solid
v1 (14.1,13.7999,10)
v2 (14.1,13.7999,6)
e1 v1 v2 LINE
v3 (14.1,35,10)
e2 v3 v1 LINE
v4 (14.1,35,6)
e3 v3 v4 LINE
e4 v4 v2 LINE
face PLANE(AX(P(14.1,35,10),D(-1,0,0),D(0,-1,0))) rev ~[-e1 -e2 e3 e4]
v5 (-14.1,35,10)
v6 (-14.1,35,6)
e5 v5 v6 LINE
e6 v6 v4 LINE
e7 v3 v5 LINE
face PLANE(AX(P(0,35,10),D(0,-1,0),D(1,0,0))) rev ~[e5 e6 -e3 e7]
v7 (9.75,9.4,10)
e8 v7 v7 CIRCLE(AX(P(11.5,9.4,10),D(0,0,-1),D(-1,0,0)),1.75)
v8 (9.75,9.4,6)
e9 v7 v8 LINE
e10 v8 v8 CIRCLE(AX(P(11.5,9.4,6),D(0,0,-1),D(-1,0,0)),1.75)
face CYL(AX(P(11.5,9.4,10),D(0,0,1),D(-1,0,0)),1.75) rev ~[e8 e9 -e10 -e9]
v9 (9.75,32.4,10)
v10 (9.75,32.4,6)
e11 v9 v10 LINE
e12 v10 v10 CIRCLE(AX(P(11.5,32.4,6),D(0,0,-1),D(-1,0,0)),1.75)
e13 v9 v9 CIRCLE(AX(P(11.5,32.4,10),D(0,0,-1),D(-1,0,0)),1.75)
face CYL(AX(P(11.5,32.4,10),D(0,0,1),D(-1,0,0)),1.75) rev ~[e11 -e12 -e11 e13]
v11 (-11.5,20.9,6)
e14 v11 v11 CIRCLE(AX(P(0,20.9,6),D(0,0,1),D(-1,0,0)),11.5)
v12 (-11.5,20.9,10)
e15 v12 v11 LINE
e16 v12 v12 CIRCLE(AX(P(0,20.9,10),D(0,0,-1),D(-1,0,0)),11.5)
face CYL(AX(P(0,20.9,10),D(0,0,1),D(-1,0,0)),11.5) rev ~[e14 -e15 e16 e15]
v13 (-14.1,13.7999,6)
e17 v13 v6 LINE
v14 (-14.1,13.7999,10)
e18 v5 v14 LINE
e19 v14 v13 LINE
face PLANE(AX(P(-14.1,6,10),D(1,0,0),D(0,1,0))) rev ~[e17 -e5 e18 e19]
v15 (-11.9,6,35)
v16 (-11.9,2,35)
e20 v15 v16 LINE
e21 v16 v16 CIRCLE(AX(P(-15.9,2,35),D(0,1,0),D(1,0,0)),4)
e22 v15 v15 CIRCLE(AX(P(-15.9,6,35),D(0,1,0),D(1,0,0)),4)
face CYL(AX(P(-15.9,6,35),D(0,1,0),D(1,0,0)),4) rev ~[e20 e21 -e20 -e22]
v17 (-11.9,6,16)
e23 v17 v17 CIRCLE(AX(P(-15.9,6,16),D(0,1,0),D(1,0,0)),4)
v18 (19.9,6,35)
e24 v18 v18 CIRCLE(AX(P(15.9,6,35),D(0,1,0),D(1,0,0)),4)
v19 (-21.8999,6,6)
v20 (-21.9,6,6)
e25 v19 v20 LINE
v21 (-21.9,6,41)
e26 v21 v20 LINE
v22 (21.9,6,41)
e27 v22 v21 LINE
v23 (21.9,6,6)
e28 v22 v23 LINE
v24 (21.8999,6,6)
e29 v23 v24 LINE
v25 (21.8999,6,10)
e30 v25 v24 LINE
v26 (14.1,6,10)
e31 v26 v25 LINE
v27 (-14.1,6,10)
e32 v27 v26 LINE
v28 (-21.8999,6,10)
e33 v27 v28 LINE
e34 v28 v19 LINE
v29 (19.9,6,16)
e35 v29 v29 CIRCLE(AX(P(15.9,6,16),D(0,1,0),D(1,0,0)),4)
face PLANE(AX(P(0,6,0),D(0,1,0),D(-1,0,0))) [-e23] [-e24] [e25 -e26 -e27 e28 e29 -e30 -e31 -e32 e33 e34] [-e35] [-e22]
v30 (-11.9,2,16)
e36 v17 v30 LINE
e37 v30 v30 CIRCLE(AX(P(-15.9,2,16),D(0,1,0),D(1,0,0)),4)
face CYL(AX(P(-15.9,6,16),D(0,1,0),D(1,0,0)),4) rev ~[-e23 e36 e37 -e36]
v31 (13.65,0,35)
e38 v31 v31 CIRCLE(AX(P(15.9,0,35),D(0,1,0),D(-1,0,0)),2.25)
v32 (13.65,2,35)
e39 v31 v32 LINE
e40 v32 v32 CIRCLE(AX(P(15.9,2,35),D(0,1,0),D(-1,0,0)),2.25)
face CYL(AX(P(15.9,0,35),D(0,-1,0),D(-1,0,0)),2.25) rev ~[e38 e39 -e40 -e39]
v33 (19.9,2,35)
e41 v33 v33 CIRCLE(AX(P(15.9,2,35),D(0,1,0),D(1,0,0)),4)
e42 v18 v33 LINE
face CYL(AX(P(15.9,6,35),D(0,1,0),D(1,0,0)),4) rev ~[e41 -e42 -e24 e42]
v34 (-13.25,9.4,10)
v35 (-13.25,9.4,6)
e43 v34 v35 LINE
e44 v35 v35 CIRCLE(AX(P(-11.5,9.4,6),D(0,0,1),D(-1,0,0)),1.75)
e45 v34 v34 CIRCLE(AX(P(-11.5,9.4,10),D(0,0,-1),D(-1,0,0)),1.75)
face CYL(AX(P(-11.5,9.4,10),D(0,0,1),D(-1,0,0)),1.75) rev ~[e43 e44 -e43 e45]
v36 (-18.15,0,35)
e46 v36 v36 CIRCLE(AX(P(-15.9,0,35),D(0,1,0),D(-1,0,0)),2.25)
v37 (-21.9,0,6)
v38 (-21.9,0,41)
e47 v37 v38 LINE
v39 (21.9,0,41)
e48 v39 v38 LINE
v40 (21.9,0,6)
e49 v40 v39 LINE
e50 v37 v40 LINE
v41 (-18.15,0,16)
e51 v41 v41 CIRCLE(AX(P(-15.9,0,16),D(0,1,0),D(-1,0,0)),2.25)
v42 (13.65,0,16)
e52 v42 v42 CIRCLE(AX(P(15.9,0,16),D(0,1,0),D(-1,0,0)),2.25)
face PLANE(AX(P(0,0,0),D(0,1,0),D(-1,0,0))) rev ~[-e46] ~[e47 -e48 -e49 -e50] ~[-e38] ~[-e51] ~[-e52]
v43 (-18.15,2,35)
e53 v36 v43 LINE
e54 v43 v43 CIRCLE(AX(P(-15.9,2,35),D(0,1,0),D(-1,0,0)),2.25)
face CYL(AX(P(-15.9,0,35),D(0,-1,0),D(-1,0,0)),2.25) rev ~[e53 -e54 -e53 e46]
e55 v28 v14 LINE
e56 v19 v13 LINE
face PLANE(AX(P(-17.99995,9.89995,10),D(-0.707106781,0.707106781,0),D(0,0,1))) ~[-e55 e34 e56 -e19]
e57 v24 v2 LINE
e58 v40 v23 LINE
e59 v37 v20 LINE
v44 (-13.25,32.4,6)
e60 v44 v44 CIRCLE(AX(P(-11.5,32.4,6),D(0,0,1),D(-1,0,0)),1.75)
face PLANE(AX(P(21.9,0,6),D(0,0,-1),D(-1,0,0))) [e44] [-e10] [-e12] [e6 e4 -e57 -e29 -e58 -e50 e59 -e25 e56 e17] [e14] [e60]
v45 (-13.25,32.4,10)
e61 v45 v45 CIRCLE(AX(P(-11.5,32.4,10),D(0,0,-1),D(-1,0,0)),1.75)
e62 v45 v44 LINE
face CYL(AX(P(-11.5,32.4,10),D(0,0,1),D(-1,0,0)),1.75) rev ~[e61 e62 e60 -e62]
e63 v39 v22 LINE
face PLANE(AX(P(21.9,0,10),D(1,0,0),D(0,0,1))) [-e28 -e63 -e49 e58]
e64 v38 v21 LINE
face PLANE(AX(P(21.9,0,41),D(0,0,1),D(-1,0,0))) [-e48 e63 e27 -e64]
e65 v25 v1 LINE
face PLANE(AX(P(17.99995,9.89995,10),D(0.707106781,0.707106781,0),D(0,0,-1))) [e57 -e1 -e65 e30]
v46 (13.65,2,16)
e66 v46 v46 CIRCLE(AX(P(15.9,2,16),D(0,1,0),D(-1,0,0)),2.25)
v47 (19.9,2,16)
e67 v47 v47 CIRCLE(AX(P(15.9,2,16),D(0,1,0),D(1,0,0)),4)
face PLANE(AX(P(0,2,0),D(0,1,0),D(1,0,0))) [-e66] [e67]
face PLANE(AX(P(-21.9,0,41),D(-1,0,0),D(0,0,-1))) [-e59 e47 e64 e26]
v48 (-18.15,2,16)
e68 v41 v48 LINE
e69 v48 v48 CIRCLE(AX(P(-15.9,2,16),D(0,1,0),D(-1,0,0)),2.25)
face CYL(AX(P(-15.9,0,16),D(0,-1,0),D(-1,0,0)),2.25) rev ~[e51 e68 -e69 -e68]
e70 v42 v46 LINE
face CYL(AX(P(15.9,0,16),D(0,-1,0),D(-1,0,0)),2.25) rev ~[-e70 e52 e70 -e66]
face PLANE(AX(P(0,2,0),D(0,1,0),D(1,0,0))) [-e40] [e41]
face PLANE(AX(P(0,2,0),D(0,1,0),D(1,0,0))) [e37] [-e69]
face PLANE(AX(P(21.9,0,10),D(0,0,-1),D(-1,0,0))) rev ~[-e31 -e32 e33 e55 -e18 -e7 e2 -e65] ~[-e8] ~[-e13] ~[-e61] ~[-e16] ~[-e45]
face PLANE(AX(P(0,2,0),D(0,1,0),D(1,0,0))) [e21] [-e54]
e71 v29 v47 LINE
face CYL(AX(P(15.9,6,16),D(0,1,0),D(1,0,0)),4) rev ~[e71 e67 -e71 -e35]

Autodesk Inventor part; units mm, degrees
ref_plane "YZ Plane" through (0, 0, 0) normal (1, 0, 0) x (0, 1, 0)
ref_plane "XZ Plane" through (0, 0, 0) normal (0, 1, 0) x (-1, 0, 0)
ref_plane "XY Plane" through (0, 0, 0) normal (0, 0, 1) x (1, 0, 0)
sketch "Sketch1" plane through (0, 0, 0) normal (0, 1, 0) x (-1, 0, 0)
  circle A0 centre (15.9, 35) radius 2.25
  circle A1 centre (15.9, 16) radius 2.25
  circle A2 centre (-15.9, 16) radius 2.25
  circle A3 centre (-15.9, 35) radius 2.25
  line L0 (21.9, 10) -> (-21.9, 10)
  line L1 (-21.9, 10) -> (-21.9, 41)
  line L2 (-21.9, 41) -> (21.9, 41)
  line L3 (21.9, 41) -> (21.9, 10)
  point P0 (0, 0)
  point P1 (0, 0)
  dimension "d0" = 43.8
  dimension "d1" = 31
extrude "Extrusion1" add sketch "Sketch1" along normal blind 6
sketch "Sketch2" plane through (0, 6, 0) normal (0, 1, 0) x (1, 0, 0)
  circle A0 centre (-15.9, -16) radius 2.25 projected
  circle A1 centre (-15.9, -16) radius 4
  circle A2 centre (-15.9, -35) radius 2.25 projected
  circle A3 centre (-15.9, -35) radius 4
  circle A4 centre (15.9, -35) radius 2.25 projected
  circle A5 centre (15.9, -35) radius 4
  circle A6 centre (15.9, -16) radius 2.25 projected
  circle A7 centre (15.9, -16) radius 4
  point P0 (0, 0)
  dimension "d4" = 8
  dimension "d5" = 8
  dimension "d6" = 8
  dimension "d7" = 8
extrude "Extrusion2" cut sketch "Sketch2" against normal blind 4
sketch "Sketch4" plane through (21.9, 0, 10) normal (0, 0, -1) x (-1, 0, 0)
  line L0 (43.8, 0) -> (0, 0) projected
  line L1 (43.8, 0) -> (43.8, 6) projected
  line L2 (0, 6) -> (43.8, 6) projected
  line L3 (0, 0) -> (0, 6) projected
  line L4 (0, 6) -> (43.8, 6) projected
  line L5 (36, 6) -> (36, 35)
  line L6 (36, 35) -> (21.9, 35)
  line L7 (36, 35) -> (7.8, 35)
  line L8 (7.8, 35) -> (7.8, 6)
  line L9 (36, 6.8) -> (36, 35)
  line L10 (33.4, 32.4) -> (21.9, 32.4)
  line L11 (10.4, 9.4) -> (33.4, 9.4)
  circle A0 centre (33.4, 32.4) radius 1.75
  circle A1 centre (10.4, 32.4) radius 1.75
  circle A2 centre (10.4, 9.4) radius 1.75
  circle A3 centre (33.4, 9.4) radius 1.75
  circle A4 centre (21.9, 20.9) radius 11.5
  point P0 (21.9, 0)
  dimension "d31" = 14.1
  dimension "d34" = 11.5
  dimension "d39" = 3.5
  dimension "d40" = 3.5
  dimension "d41" = 3.5
  dimension "d42" = 3.5
  dimension "d43" = 23
extrude "Extrusion4" add sketch "Sketch4" along normal blind 4
chamfer "Chamfer3" distance 7.8 angle 45 1 edges at (14.1, 6, 8)
chamfer "Chamfer4" distance 7.8 angle 45 1 edges at (-14.1, 6, 8)
properties part number "NEMA14 Mounting Bracket"
